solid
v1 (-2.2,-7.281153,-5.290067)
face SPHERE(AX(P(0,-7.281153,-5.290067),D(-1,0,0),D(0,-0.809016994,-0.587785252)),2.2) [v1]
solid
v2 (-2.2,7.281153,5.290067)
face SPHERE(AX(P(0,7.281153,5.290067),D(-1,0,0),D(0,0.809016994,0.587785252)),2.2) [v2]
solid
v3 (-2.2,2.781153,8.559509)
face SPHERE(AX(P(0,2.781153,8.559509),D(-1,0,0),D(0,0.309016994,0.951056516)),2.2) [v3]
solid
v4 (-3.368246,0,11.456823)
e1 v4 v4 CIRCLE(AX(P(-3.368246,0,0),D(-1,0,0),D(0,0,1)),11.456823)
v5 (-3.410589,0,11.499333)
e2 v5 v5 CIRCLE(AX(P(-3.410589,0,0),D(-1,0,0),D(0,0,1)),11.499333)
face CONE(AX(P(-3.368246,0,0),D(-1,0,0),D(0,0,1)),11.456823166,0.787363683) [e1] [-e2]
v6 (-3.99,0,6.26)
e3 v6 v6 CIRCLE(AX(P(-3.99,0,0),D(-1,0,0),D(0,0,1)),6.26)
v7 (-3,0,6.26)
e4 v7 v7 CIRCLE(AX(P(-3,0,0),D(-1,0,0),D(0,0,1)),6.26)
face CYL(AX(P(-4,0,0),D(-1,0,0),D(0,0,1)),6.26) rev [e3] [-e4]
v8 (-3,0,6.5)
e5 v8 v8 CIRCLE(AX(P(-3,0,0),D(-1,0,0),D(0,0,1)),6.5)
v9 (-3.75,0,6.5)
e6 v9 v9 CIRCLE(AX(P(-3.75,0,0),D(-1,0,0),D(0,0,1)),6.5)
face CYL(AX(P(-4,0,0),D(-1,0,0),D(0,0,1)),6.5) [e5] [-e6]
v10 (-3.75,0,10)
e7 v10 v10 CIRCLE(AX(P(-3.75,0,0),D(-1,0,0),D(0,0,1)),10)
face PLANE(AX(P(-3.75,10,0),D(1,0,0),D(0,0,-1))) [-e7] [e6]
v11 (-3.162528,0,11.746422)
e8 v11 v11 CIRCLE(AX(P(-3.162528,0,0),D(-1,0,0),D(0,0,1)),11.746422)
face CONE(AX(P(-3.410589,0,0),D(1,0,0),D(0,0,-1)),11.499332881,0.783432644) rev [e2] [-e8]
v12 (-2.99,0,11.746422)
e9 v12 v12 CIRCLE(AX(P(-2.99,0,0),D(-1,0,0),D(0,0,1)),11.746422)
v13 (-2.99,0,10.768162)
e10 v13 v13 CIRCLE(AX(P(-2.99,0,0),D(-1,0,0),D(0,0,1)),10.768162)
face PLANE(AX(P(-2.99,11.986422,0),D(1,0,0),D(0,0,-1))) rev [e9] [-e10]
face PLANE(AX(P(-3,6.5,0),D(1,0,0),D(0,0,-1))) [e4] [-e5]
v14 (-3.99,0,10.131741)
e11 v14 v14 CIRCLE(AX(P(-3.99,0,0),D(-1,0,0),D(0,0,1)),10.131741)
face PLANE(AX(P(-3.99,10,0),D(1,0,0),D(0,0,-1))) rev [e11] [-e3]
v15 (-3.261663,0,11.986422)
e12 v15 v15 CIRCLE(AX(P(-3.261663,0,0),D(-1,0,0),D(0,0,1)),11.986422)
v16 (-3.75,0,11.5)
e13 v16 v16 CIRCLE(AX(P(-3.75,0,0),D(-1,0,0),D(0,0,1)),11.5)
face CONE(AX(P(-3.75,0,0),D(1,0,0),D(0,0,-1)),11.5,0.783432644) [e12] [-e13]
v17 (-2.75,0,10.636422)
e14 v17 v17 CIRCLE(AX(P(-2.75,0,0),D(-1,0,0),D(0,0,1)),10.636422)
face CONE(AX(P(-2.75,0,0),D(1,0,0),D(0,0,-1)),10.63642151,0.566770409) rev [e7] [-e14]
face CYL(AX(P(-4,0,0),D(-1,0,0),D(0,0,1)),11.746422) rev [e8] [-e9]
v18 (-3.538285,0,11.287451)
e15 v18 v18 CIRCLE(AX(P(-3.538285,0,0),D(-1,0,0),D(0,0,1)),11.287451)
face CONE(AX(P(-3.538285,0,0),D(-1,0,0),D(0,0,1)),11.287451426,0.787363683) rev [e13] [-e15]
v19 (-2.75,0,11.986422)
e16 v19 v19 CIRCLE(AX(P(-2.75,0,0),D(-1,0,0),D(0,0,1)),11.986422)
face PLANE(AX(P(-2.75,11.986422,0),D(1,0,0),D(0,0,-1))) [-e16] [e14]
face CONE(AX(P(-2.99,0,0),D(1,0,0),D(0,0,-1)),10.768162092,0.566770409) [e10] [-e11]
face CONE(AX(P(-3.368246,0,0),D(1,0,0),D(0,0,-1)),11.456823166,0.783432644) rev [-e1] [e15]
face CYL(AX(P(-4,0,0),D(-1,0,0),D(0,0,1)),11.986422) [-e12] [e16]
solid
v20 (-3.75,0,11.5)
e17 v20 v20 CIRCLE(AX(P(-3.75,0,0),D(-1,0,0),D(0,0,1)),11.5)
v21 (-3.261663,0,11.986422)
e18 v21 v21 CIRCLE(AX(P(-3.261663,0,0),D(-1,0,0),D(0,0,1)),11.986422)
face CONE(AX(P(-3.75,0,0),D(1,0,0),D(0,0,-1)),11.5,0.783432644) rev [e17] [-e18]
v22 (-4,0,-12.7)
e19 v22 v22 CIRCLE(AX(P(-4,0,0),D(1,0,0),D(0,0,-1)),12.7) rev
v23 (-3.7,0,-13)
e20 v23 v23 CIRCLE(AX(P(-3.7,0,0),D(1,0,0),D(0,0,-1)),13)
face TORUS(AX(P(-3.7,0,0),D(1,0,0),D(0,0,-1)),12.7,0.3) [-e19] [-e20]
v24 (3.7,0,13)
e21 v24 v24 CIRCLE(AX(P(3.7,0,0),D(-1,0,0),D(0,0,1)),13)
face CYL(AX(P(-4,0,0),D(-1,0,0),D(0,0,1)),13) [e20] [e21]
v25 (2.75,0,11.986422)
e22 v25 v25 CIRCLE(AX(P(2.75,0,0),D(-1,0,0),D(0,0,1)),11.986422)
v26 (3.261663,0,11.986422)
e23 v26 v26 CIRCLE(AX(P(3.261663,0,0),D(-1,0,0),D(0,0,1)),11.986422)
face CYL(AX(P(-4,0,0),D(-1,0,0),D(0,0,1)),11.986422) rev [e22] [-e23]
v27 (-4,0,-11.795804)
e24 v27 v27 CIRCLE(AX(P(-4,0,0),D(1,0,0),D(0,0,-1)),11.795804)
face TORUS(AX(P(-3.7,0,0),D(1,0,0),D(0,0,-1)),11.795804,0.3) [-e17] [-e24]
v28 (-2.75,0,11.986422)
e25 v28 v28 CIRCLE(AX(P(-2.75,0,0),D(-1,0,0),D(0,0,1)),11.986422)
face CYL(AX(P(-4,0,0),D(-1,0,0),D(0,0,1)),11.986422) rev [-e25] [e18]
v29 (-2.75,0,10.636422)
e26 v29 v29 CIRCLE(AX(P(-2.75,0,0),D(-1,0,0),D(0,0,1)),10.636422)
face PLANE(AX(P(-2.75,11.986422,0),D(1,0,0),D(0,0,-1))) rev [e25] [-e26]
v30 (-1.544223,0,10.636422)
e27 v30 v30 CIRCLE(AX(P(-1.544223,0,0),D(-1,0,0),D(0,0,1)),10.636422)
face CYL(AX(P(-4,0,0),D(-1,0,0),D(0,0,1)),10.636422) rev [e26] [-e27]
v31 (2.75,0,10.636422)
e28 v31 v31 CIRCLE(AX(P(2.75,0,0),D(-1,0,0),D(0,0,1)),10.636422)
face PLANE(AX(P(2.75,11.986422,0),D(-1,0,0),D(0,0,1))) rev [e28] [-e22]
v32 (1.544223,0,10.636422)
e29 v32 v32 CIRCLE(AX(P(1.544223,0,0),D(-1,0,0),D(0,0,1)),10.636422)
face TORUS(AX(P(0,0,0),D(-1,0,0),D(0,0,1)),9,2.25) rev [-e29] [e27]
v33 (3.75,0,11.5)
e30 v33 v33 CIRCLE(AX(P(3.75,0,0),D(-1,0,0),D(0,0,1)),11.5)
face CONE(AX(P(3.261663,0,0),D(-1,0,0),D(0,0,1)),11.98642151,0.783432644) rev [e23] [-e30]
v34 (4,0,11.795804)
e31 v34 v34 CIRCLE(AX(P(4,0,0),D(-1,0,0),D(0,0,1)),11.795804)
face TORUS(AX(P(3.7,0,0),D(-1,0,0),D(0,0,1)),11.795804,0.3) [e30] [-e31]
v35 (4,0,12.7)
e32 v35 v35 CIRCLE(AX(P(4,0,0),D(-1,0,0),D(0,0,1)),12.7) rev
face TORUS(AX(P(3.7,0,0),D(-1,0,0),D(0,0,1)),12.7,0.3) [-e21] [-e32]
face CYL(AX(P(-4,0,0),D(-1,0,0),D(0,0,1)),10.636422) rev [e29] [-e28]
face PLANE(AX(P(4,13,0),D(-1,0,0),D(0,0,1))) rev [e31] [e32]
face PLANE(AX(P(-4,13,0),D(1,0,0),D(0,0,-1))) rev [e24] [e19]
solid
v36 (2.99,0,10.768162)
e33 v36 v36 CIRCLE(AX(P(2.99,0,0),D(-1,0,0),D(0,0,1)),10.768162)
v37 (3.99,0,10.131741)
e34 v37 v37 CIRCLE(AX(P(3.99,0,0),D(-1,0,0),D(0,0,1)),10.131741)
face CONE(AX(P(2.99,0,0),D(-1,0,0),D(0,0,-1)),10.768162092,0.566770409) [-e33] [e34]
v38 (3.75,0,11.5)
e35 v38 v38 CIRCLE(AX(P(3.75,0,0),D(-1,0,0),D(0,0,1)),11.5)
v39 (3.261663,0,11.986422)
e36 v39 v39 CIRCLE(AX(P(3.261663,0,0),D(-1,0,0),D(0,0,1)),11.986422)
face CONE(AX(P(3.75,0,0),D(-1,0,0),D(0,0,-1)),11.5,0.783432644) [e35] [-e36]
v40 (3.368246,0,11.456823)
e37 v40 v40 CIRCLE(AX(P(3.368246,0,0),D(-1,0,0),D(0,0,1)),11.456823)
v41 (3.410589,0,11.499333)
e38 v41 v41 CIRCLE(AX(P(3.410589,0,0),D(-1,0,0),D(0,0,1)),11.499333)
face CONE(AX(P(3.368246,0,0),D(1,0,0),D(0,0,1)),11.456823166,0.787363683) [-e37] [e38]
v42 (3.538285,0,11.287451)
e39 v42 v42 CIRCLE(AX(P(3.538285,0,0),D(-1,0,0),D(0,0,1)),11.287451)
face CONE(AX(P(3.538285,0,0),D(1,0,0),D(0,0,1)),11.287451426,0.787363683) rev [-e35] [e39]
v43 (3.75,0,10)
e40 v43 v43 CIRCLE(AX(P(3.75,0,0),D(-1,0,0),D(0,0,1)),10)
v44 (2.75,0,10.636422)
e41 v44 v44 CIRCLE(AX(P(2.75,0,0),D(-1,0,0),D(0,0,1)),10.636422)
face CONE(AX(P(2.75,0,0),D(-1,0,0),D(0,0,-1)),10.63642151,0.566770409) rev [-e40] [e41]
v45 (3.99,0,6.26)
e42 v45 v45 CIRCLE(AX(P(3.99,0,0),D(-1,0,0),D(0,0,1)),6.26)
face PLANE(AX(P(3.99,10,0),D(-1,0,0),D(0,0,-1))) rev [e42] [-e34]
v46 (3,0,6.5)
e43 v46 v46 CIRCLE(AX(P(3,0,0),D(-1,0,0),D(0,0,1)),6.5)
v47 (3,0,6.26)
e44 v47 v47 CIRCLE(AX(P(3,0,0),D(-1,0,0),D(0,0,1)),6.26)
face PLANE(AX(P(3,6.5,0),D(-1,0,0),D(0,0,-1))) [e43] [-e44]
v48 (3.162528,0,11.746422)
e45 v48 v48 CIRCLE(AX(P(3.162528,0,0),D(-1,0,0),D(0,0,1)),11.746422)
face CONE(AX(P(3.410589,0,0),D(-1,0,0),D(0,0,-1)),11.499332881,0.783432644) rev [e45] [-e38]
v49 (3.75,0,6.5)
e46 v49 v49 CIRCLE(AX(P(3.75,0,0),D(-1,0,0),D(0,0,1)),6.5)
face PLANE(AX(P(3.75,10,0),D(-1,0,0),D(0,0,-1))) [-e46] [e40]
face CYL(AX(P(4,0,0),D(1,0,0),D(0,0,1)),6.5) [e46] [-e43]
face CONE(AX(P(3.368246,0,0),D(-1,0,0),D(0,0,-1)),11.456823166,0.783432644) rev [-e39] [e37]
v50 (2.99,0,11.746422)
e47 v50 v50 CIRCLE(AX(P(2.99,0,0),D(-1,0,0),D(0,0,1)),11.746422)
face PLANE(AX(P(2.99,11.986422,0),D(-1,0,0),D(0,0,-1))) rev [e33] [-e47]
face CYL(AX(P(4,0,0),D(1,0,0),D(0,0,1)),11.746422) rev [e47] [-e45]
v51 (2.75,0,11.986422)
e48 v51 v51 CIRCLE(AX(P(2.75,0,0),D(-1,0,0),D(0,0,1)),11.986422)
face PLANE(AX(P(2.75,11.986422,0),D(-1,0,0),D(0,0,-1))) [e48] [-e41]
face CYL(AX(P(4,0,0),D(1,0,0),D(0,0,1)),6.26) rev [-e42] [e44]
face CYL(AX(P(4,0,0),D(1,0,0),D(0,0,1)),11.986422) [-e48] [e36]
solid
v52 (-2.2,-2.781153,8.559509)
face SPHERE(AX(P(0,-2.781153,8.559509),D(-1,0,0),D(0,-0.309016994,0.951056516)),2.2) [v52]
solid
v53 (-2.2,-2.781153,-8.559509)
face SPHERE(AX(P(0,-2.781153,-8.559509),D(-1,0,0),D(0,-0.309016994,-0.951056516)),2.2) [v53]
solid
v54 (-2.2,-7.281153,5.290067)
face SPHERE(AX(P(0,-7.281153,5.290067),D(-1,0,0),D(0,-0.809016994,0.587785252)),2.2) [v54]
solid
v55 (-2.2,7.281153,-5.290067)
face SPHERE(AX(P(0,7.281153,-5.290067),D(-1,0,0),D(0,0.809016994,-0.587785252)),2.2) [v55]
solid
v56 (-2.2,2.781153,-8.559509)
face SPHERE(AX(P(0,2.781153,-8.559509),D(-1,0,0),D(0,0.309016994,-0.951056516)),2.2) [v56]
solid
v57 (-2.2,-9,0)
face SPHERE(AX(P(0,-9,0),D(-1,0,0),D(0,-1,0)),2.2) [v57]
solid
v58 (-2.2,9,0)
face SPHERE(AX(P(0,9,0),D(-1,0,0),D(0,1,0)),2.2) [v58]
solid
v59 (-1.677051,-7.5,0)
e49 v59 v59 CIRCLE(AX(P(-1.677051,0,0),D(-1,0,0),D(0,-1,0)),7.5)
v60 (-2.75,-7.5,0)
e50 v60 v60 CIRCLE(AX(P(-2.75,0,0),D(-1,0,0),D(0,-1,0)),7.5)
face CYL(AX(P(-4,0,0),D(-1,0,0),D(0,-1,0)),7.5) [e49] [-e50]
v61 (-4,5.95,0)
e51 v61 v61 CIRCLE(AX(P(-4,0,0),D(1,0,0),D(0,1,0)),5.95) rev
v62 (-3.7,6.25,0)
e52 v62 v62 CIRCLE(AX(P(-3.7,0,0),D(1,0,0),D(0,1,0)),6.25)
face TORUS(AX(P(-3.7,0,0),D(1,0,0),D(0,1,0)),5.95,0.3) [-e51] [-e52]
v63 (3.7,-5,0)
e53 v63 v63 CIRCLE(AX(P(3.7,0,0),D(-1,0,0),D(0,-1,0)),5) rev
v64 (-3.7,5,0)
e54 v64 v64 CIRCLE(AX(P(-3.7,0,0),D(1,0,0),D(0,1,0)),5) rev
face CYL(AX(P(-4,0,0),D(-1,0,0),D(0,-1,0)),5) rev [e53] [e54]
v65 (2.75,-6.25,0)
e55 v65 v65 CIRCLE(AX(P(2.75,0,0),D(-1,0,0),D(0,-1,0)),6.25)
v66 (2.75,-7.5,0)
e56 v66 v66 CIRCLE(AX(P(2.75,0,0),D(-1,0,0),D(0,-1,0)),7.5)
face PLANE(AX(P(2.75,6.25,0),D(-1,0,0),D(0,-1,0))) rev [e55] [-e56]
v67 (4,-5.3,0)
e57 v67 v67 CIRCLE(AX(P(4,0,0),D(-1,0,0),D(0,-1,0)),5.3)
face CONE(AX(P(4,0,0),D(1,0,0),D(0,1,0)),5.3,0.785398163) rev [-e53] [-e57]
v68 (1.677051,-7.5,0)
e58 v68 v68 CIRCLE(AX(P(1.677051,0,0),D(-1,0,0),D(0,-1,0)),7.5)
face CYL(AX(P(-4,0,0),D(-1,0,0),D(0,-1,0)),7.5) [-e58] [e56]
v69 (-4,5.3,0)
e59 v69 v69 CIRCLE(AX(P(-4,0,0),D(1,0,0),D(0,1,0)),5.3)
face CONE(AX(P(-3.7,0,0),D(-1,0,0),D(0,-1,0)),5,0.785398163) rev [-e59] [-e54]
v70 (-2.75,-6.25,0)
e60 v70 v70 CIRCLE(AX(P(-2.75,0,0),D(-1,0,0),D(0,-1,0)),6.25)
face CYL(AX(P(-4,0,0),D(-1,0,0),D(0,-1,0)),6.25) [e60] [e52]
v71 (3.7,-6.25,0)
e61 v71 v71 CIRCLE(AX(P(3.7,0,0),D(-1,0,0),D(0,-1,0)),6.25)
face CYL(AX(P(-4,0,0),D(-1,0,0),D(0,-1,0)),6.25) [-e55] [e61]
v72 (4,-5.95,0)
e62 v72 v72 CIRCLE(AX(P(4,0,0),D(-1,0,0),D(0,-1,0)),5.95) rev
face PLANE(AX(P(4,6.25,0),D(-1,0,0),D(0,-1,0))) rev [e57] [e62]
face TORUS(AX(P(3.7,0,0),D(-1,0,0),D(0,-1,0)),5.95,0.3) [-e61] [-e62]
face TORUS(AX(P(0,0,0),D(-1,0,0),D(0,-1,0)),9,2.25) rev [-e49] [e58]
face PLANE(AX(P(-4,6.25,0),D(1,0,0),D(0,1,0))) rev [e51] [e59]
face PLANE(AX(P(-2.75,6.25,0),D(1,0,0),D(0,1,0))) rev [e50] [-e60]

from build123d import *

# Parameters (mm, degrees)
RACCORDO1_R                 = 0.3
RACCORDO2_R                 = 0.3
SMUSSO1_SIZE                = 0.3
RIPETIZIONECIRCOLARE1_COUNT = 10


with BuildPart() as part:
    # Schizzo2 → Rivoluzione1 (revolve)
    with BuildSketch(Plane.XY, mode=Mode.PRIVATE) as rivoluzione1_sk:
        with BuildLine():
            Line((4, 13), (-4, 13))
            Line((-4, 13), (-4, 11.5))
            Line((-4, 11.5), (-3.75, 11.5))
            Line((-3.75, 11.5), (-3.261662579, 11.98642151))
            Line((-3.261662579, 11.98642151), (-2.75, 11.98642151))
            Line((-2.75, 11.98642151), (-2.75, 10.63642151))
            Line((-2.75, 10.63642151), (-1.544222989, 10.63642151))
            ThreePointArc((-1.544222989, 10.63642151), (0, 11.25), (1.544222989, 10.63642151))
            Line((1.544222989, 10.63642151), (2.75, 10.63642151))
            Line((2.75, 10.63642151), (2.75, 11.98642151))
            Line((2.75, 11.98642151), (3.261662579, 11.98642151))
            Line((3.261662579, 11.98642151), (3.75, 11.5))
            Line((3.75, 11.5), (4, 11.5))
            Line((4, 11.5), (4, 13))
        make_face()
    revolve(rivoluzione1_sk.sketch.rotate(Axis((-4, 0, 0), (1, 0, 0)), 90), axis=Axis((-4, 0, 0), (1, 0, 0)))

    # Raccordo1
    # the kernel refuses this fillet: 0.3 mm, written as the material it takes off along each edge
    with BuildSketch(Plane(origin=(-4, 0, 0), x_dir=(0, 0, 1), z_dir=(0, 1, 0))) as raccordo1_piece_1:
        with BuildLine():
            CenterArc((11.795803989, 0.3), RACCORDO1_R, 189.594068227, 80.405931773)
            Line((11.5, 0.25), (11.49408392, 0.249))
            ThreePointArc((11.49408392, 0.249), (11.494, 0.125), (11.494, 0))
            Line((11.494, 0), (11.5, -0.006))
            Line((11.5, -0.006), (11.795803989, -0.006))
            Line((11.795803989, -0.006), (11.795803989, 0))
        make_face()
    revolve(axis=Axis((-4, 0, 0), (1, 0, 0)), mode=Mode.SUBTRACT)
    with BuildSketch(Plane(origin=(-4, 0, 0), x_dir=(0, 0, 1), z_dir=(0, 1, 0))) as raccordo1_piece_2:
        with BuildLine():
            CenterArc((13 - RACCORDO1_R, RACCORDO1_R), RACCORDO1_R, 270, 90)
            Line((13 - RACCORDO1_R, 0), (13 - RACCORDO1_R, -RACCORDO1_R * 0.02))
            Line((13 - RACCORDO1_R, -RACCORDO1_R * 0.02), (13 + RACCORDO1_R * 0.02, -RACCORDO1_R * 0.02))
            Line((13 + RACCORDO1_R * 0.02, -RACCORDO1_R * 0.02), (13 + RACCORDO1_R * 0.02, RACCORDO1_R))
            Line((13 + RACCORDO1_R * 0.02, RACCORDO1_R), (13, RACCORDO1_R))
        make_face()
    revolve(axis=Axis((-4, 0, 0), (1, 0, 0)), mode=Mode.SUBTRACT)
    with BuildSketch(Plane(origin=(4, 0, 0), x_dir=(0, 0, 1), z_dir=(0, 1, 0))) as raccordo1_piece_3:
        with BuildLine():
            CenterArc((13 - RACCORDO1_R, -RACCORDO1_R), RACCORDO1_R, 0, 90)
            Line((13 - RACCORDO1_R, 0), (13 - RACCORDO1_R, RACCORDO1_R * 0.02))
            Line((13 - RACCORDO1_R, RACCORDO1_R * 0.02), (13 + RACCORDO1_R * 0.02, RACCORDO1_R * 0.02))
            Line((13 + RACCORDO1_R * 0.02, RACCORDO1_R * 0.02), (13 + RACCORDO1_R * 0.02, -RACCORDO1_R))
            Line((13 + RACCORDO1_R * 0.02, -RACCORDO1_R), (13, -RACCORDO1_R))
        make_face()
    revolve(axis=Axis((4, 0, 0), (1, 0, 0)), mode=Mode.SUBTRACT)
    with BuildSketch(Plane(origin=(4, 0, 0), x_dir=(0, 0, 1), z_dir=(0, 1, 0))) as raccordo1_piece_4:
        with BuildLine():
            CenterArc((11.795803989, -0.3), RACCORDO1_R, 90, 80.405931773)
            Line((11.795803989, 0), (11.795803989, 0.006))
            Line((11.795803989, 0.006), (11.5, 0.006))
            Line((11.5, 0.006), (11.494, 0))
            ThreePointArc((11.494, 0), (11.494, -0.125), (11.49408392, -0.249))
            Line((11.49408392, -0.249), (11.5, -0.25))
        make_face()
    revolve(axis=Axis((4, 0, 0), (1, 0, 0)), mode=Mode.SUBTRACT)


with BuildPart() as body_2:
    # Schizzo3 → Rivoluzione2 (revolve)
    with BuildSketch(Plane.XY, mode=Mode.PRIVATE) as rivoluzione2_sk:
        with BuildLine():
            Line((-2.75, 7.5), (-1.677050983, 7.5))
            ThreePointArc((-1.677050983, 7.5), (0, 6.75), (1.677050983, 7.5))
            Line((1.677050983, 7.5), (2.75, 7.5))
            Line((2.75, 7.5), (2.75, 6.25))
            Line((2.75, 6.25), (4, 6.25))
            Line((4, 6.25), (4, 5))
            Line((4, 5), (-4, 5))
            Line((-4, 5), (-4, 6.25))
            Line((-4, 6.25), (-2.75, 6.25))
            Line((-2.75, 6.25), (-2.75, 7.5))
        make_face()
    revolve(rivoluzione2_sk.sketch.rotate(Axis((-4, 0, 0), (1, 0, 0)), 180), axis=Axis((-4, 0, 0), (1, 0, 0)))

    # Raccordo2
    raccordo2_edges = [body_2.edges().sort_by_distance(p)[0] for p in [
        (-4, 6.25, 0),
        (4, 6.25, 0),
    ]]
    fillet(raccordo2_edges, radius=RACCORDO2_R)

    # Smusso1
    smusso1_edges = [body_2.edges().sort_by_distance(p)[0] for p in [
        (-4, 5, 0),
        (4, 5, 0),
    ]]
    chamfer(smusso1_edges, length=SMUSSO1_SIZE)


with BuildPart() as body_3:
    # Schizzo4 → Rivoluzione3 (revolve)
    with BuildSketch(Plane.XY):
        with BuildLine():
            Line((-2.2, 9), (2.2, 9))
            ThreePointArc((2.2, 9), (0, 11.2), (-2.2, 9))
        make_face()
    revolve(axis=Axis((-2.2, 9, 0), (1, 0, 0)))


with BuildPart() as ripetizionecircolare1_1:
    # RipetizioneCircolare1: pattern copy
    add(body_3.part.rotate(Axis((0, 0, 0), (1, 0, 0)), 1 * 360 / RIPETIZIONECIRCOLARE1_COUNT))


with BuildPart() as ripetizionecircolare1_2:
    # RipetizioneCircolare1: pattern copy
    add(body_3.part.rotate(Axis((0, 0, 0), (1, 0, 0)), 2 * 360 / RIPETIZIONECIRCOLARE1_COUNT))


with BuildPart() as ripetizionecircolare1_3:
    # RipetizioneCircolare1: pattern copy
    add(body_3.part.rotate(Axis((0, 0, 0), (1, 0, 0)), 3 * 360 / RIPETIZIONECIRCOLARE1_COUNT))


with BuildPart() as ripetizionecircolare1_4:
    # RipetizioneCircolare1: pattern copy
    add(body_3.part.rotate(Axis((0, 0, 0), (1, 0, 0)), 4 * 360 / RIPETIZIONECIRCOLARE1_COUNT))


with BuildPart() as ripetizionecircolare1_5:
    # RipetizioneCircolare1: pattern copy
    add(body_3.part.rotate(Axis((0, 0, 0), (1, 0, 0)), 5 * 360 / RIPETIZIONECIRCOLARE1_COUNT))


with BuildPart() as ripetizionecircolare1_6:
    # RipetizioneCircolare1: pattern copy
    add(body_3.part.rotate(Axis((0, 0, 0), (1, 0, 0)), 6 * 360 / RIPETIZIONECIRCOLARE1_COUNT))


with BuildPart() as ripetizionecircolare1_7:
    # RipetizioneCircolare1: pattern copy
    add(body_3.part.rotate(Axis((0, 0, 0), (1, 0, 0)), 7 * 360 / RIPETIZIONECIRCOLARE1_COUNT))


with BuildPart() as ripetizionecircolare1_8:
    # RipetizioneCircolare1: pattern copy
    add(body_3.part.rotate(Axis((0, 0, 0), (1, 0, 0)), 8 * 360 / RIPETIZIONECIRCOLARE1_COUNT))


with BuildPart() as ripetizionecircolare1_9:
    # RipetizioneCircolare1: pattern copy
    add(body_3.part.rotate(Axis((0, 0, 0), (1, 0, 0)), 9 * 360 / RIPETIZIONECIRCOLARE1_COUNT))


with BuildPart() as body_13:
    # Schizzo5 → Rivoluzione-Sottile1 (revolve)
    with BuildSketch(Plane.XY, mode=Mode.PRIVATE) as rivoluzione_sottile1_sk:
        Polygon((-3, 6.5), (-3.75, 6.5), (-3.75, 10), (-2.75, 10.63642151), (-2.75, 11.98642151), (-3.261662579, 11.98642151), (-3.75, 11.5), (-3.538285325, 11.287451426), (-3.368246466, 11.456823166), (-3.410589401, 11.499332881), (-3.162527542, 11.74642151), (-2.99, 11.74642151), (-2.99, 10.768162092), (-3.99, 10.131740582), (-3.99, 6.26), (-3, 6.26), align=None)
    revolve(rivoluzione_sottile1_sk.sketch.rotate(Axis((-4, 0, 0), (1, 0, 0)), 90), axis=Axis((-4, 0, 0), (1, 0, 0)))


with BuildPart() as body_14:
    # Specchia1: mirrored copy
    add(body_13.part.mirror(Plane(origin=(0, 0, 0), x_dir=(0, 0, 1), z_dir=(1, 0, 0))))


solid = Compound([part.part, body_2.part, body_3.part, ripetizionecircolare1_1.part, ripetizionecircolare1_2.part, ripetizionecircolare1_3.part, ripetizionecircolare1_4.part, ripetizionecircolare1_5.part, ripetizionecircolare1_6.part, ripetizionecircolare1_7.part, ripetizionecircolare1_8.part, ripetizionecircolare1_9.part, body_13.part, body_14.part])
